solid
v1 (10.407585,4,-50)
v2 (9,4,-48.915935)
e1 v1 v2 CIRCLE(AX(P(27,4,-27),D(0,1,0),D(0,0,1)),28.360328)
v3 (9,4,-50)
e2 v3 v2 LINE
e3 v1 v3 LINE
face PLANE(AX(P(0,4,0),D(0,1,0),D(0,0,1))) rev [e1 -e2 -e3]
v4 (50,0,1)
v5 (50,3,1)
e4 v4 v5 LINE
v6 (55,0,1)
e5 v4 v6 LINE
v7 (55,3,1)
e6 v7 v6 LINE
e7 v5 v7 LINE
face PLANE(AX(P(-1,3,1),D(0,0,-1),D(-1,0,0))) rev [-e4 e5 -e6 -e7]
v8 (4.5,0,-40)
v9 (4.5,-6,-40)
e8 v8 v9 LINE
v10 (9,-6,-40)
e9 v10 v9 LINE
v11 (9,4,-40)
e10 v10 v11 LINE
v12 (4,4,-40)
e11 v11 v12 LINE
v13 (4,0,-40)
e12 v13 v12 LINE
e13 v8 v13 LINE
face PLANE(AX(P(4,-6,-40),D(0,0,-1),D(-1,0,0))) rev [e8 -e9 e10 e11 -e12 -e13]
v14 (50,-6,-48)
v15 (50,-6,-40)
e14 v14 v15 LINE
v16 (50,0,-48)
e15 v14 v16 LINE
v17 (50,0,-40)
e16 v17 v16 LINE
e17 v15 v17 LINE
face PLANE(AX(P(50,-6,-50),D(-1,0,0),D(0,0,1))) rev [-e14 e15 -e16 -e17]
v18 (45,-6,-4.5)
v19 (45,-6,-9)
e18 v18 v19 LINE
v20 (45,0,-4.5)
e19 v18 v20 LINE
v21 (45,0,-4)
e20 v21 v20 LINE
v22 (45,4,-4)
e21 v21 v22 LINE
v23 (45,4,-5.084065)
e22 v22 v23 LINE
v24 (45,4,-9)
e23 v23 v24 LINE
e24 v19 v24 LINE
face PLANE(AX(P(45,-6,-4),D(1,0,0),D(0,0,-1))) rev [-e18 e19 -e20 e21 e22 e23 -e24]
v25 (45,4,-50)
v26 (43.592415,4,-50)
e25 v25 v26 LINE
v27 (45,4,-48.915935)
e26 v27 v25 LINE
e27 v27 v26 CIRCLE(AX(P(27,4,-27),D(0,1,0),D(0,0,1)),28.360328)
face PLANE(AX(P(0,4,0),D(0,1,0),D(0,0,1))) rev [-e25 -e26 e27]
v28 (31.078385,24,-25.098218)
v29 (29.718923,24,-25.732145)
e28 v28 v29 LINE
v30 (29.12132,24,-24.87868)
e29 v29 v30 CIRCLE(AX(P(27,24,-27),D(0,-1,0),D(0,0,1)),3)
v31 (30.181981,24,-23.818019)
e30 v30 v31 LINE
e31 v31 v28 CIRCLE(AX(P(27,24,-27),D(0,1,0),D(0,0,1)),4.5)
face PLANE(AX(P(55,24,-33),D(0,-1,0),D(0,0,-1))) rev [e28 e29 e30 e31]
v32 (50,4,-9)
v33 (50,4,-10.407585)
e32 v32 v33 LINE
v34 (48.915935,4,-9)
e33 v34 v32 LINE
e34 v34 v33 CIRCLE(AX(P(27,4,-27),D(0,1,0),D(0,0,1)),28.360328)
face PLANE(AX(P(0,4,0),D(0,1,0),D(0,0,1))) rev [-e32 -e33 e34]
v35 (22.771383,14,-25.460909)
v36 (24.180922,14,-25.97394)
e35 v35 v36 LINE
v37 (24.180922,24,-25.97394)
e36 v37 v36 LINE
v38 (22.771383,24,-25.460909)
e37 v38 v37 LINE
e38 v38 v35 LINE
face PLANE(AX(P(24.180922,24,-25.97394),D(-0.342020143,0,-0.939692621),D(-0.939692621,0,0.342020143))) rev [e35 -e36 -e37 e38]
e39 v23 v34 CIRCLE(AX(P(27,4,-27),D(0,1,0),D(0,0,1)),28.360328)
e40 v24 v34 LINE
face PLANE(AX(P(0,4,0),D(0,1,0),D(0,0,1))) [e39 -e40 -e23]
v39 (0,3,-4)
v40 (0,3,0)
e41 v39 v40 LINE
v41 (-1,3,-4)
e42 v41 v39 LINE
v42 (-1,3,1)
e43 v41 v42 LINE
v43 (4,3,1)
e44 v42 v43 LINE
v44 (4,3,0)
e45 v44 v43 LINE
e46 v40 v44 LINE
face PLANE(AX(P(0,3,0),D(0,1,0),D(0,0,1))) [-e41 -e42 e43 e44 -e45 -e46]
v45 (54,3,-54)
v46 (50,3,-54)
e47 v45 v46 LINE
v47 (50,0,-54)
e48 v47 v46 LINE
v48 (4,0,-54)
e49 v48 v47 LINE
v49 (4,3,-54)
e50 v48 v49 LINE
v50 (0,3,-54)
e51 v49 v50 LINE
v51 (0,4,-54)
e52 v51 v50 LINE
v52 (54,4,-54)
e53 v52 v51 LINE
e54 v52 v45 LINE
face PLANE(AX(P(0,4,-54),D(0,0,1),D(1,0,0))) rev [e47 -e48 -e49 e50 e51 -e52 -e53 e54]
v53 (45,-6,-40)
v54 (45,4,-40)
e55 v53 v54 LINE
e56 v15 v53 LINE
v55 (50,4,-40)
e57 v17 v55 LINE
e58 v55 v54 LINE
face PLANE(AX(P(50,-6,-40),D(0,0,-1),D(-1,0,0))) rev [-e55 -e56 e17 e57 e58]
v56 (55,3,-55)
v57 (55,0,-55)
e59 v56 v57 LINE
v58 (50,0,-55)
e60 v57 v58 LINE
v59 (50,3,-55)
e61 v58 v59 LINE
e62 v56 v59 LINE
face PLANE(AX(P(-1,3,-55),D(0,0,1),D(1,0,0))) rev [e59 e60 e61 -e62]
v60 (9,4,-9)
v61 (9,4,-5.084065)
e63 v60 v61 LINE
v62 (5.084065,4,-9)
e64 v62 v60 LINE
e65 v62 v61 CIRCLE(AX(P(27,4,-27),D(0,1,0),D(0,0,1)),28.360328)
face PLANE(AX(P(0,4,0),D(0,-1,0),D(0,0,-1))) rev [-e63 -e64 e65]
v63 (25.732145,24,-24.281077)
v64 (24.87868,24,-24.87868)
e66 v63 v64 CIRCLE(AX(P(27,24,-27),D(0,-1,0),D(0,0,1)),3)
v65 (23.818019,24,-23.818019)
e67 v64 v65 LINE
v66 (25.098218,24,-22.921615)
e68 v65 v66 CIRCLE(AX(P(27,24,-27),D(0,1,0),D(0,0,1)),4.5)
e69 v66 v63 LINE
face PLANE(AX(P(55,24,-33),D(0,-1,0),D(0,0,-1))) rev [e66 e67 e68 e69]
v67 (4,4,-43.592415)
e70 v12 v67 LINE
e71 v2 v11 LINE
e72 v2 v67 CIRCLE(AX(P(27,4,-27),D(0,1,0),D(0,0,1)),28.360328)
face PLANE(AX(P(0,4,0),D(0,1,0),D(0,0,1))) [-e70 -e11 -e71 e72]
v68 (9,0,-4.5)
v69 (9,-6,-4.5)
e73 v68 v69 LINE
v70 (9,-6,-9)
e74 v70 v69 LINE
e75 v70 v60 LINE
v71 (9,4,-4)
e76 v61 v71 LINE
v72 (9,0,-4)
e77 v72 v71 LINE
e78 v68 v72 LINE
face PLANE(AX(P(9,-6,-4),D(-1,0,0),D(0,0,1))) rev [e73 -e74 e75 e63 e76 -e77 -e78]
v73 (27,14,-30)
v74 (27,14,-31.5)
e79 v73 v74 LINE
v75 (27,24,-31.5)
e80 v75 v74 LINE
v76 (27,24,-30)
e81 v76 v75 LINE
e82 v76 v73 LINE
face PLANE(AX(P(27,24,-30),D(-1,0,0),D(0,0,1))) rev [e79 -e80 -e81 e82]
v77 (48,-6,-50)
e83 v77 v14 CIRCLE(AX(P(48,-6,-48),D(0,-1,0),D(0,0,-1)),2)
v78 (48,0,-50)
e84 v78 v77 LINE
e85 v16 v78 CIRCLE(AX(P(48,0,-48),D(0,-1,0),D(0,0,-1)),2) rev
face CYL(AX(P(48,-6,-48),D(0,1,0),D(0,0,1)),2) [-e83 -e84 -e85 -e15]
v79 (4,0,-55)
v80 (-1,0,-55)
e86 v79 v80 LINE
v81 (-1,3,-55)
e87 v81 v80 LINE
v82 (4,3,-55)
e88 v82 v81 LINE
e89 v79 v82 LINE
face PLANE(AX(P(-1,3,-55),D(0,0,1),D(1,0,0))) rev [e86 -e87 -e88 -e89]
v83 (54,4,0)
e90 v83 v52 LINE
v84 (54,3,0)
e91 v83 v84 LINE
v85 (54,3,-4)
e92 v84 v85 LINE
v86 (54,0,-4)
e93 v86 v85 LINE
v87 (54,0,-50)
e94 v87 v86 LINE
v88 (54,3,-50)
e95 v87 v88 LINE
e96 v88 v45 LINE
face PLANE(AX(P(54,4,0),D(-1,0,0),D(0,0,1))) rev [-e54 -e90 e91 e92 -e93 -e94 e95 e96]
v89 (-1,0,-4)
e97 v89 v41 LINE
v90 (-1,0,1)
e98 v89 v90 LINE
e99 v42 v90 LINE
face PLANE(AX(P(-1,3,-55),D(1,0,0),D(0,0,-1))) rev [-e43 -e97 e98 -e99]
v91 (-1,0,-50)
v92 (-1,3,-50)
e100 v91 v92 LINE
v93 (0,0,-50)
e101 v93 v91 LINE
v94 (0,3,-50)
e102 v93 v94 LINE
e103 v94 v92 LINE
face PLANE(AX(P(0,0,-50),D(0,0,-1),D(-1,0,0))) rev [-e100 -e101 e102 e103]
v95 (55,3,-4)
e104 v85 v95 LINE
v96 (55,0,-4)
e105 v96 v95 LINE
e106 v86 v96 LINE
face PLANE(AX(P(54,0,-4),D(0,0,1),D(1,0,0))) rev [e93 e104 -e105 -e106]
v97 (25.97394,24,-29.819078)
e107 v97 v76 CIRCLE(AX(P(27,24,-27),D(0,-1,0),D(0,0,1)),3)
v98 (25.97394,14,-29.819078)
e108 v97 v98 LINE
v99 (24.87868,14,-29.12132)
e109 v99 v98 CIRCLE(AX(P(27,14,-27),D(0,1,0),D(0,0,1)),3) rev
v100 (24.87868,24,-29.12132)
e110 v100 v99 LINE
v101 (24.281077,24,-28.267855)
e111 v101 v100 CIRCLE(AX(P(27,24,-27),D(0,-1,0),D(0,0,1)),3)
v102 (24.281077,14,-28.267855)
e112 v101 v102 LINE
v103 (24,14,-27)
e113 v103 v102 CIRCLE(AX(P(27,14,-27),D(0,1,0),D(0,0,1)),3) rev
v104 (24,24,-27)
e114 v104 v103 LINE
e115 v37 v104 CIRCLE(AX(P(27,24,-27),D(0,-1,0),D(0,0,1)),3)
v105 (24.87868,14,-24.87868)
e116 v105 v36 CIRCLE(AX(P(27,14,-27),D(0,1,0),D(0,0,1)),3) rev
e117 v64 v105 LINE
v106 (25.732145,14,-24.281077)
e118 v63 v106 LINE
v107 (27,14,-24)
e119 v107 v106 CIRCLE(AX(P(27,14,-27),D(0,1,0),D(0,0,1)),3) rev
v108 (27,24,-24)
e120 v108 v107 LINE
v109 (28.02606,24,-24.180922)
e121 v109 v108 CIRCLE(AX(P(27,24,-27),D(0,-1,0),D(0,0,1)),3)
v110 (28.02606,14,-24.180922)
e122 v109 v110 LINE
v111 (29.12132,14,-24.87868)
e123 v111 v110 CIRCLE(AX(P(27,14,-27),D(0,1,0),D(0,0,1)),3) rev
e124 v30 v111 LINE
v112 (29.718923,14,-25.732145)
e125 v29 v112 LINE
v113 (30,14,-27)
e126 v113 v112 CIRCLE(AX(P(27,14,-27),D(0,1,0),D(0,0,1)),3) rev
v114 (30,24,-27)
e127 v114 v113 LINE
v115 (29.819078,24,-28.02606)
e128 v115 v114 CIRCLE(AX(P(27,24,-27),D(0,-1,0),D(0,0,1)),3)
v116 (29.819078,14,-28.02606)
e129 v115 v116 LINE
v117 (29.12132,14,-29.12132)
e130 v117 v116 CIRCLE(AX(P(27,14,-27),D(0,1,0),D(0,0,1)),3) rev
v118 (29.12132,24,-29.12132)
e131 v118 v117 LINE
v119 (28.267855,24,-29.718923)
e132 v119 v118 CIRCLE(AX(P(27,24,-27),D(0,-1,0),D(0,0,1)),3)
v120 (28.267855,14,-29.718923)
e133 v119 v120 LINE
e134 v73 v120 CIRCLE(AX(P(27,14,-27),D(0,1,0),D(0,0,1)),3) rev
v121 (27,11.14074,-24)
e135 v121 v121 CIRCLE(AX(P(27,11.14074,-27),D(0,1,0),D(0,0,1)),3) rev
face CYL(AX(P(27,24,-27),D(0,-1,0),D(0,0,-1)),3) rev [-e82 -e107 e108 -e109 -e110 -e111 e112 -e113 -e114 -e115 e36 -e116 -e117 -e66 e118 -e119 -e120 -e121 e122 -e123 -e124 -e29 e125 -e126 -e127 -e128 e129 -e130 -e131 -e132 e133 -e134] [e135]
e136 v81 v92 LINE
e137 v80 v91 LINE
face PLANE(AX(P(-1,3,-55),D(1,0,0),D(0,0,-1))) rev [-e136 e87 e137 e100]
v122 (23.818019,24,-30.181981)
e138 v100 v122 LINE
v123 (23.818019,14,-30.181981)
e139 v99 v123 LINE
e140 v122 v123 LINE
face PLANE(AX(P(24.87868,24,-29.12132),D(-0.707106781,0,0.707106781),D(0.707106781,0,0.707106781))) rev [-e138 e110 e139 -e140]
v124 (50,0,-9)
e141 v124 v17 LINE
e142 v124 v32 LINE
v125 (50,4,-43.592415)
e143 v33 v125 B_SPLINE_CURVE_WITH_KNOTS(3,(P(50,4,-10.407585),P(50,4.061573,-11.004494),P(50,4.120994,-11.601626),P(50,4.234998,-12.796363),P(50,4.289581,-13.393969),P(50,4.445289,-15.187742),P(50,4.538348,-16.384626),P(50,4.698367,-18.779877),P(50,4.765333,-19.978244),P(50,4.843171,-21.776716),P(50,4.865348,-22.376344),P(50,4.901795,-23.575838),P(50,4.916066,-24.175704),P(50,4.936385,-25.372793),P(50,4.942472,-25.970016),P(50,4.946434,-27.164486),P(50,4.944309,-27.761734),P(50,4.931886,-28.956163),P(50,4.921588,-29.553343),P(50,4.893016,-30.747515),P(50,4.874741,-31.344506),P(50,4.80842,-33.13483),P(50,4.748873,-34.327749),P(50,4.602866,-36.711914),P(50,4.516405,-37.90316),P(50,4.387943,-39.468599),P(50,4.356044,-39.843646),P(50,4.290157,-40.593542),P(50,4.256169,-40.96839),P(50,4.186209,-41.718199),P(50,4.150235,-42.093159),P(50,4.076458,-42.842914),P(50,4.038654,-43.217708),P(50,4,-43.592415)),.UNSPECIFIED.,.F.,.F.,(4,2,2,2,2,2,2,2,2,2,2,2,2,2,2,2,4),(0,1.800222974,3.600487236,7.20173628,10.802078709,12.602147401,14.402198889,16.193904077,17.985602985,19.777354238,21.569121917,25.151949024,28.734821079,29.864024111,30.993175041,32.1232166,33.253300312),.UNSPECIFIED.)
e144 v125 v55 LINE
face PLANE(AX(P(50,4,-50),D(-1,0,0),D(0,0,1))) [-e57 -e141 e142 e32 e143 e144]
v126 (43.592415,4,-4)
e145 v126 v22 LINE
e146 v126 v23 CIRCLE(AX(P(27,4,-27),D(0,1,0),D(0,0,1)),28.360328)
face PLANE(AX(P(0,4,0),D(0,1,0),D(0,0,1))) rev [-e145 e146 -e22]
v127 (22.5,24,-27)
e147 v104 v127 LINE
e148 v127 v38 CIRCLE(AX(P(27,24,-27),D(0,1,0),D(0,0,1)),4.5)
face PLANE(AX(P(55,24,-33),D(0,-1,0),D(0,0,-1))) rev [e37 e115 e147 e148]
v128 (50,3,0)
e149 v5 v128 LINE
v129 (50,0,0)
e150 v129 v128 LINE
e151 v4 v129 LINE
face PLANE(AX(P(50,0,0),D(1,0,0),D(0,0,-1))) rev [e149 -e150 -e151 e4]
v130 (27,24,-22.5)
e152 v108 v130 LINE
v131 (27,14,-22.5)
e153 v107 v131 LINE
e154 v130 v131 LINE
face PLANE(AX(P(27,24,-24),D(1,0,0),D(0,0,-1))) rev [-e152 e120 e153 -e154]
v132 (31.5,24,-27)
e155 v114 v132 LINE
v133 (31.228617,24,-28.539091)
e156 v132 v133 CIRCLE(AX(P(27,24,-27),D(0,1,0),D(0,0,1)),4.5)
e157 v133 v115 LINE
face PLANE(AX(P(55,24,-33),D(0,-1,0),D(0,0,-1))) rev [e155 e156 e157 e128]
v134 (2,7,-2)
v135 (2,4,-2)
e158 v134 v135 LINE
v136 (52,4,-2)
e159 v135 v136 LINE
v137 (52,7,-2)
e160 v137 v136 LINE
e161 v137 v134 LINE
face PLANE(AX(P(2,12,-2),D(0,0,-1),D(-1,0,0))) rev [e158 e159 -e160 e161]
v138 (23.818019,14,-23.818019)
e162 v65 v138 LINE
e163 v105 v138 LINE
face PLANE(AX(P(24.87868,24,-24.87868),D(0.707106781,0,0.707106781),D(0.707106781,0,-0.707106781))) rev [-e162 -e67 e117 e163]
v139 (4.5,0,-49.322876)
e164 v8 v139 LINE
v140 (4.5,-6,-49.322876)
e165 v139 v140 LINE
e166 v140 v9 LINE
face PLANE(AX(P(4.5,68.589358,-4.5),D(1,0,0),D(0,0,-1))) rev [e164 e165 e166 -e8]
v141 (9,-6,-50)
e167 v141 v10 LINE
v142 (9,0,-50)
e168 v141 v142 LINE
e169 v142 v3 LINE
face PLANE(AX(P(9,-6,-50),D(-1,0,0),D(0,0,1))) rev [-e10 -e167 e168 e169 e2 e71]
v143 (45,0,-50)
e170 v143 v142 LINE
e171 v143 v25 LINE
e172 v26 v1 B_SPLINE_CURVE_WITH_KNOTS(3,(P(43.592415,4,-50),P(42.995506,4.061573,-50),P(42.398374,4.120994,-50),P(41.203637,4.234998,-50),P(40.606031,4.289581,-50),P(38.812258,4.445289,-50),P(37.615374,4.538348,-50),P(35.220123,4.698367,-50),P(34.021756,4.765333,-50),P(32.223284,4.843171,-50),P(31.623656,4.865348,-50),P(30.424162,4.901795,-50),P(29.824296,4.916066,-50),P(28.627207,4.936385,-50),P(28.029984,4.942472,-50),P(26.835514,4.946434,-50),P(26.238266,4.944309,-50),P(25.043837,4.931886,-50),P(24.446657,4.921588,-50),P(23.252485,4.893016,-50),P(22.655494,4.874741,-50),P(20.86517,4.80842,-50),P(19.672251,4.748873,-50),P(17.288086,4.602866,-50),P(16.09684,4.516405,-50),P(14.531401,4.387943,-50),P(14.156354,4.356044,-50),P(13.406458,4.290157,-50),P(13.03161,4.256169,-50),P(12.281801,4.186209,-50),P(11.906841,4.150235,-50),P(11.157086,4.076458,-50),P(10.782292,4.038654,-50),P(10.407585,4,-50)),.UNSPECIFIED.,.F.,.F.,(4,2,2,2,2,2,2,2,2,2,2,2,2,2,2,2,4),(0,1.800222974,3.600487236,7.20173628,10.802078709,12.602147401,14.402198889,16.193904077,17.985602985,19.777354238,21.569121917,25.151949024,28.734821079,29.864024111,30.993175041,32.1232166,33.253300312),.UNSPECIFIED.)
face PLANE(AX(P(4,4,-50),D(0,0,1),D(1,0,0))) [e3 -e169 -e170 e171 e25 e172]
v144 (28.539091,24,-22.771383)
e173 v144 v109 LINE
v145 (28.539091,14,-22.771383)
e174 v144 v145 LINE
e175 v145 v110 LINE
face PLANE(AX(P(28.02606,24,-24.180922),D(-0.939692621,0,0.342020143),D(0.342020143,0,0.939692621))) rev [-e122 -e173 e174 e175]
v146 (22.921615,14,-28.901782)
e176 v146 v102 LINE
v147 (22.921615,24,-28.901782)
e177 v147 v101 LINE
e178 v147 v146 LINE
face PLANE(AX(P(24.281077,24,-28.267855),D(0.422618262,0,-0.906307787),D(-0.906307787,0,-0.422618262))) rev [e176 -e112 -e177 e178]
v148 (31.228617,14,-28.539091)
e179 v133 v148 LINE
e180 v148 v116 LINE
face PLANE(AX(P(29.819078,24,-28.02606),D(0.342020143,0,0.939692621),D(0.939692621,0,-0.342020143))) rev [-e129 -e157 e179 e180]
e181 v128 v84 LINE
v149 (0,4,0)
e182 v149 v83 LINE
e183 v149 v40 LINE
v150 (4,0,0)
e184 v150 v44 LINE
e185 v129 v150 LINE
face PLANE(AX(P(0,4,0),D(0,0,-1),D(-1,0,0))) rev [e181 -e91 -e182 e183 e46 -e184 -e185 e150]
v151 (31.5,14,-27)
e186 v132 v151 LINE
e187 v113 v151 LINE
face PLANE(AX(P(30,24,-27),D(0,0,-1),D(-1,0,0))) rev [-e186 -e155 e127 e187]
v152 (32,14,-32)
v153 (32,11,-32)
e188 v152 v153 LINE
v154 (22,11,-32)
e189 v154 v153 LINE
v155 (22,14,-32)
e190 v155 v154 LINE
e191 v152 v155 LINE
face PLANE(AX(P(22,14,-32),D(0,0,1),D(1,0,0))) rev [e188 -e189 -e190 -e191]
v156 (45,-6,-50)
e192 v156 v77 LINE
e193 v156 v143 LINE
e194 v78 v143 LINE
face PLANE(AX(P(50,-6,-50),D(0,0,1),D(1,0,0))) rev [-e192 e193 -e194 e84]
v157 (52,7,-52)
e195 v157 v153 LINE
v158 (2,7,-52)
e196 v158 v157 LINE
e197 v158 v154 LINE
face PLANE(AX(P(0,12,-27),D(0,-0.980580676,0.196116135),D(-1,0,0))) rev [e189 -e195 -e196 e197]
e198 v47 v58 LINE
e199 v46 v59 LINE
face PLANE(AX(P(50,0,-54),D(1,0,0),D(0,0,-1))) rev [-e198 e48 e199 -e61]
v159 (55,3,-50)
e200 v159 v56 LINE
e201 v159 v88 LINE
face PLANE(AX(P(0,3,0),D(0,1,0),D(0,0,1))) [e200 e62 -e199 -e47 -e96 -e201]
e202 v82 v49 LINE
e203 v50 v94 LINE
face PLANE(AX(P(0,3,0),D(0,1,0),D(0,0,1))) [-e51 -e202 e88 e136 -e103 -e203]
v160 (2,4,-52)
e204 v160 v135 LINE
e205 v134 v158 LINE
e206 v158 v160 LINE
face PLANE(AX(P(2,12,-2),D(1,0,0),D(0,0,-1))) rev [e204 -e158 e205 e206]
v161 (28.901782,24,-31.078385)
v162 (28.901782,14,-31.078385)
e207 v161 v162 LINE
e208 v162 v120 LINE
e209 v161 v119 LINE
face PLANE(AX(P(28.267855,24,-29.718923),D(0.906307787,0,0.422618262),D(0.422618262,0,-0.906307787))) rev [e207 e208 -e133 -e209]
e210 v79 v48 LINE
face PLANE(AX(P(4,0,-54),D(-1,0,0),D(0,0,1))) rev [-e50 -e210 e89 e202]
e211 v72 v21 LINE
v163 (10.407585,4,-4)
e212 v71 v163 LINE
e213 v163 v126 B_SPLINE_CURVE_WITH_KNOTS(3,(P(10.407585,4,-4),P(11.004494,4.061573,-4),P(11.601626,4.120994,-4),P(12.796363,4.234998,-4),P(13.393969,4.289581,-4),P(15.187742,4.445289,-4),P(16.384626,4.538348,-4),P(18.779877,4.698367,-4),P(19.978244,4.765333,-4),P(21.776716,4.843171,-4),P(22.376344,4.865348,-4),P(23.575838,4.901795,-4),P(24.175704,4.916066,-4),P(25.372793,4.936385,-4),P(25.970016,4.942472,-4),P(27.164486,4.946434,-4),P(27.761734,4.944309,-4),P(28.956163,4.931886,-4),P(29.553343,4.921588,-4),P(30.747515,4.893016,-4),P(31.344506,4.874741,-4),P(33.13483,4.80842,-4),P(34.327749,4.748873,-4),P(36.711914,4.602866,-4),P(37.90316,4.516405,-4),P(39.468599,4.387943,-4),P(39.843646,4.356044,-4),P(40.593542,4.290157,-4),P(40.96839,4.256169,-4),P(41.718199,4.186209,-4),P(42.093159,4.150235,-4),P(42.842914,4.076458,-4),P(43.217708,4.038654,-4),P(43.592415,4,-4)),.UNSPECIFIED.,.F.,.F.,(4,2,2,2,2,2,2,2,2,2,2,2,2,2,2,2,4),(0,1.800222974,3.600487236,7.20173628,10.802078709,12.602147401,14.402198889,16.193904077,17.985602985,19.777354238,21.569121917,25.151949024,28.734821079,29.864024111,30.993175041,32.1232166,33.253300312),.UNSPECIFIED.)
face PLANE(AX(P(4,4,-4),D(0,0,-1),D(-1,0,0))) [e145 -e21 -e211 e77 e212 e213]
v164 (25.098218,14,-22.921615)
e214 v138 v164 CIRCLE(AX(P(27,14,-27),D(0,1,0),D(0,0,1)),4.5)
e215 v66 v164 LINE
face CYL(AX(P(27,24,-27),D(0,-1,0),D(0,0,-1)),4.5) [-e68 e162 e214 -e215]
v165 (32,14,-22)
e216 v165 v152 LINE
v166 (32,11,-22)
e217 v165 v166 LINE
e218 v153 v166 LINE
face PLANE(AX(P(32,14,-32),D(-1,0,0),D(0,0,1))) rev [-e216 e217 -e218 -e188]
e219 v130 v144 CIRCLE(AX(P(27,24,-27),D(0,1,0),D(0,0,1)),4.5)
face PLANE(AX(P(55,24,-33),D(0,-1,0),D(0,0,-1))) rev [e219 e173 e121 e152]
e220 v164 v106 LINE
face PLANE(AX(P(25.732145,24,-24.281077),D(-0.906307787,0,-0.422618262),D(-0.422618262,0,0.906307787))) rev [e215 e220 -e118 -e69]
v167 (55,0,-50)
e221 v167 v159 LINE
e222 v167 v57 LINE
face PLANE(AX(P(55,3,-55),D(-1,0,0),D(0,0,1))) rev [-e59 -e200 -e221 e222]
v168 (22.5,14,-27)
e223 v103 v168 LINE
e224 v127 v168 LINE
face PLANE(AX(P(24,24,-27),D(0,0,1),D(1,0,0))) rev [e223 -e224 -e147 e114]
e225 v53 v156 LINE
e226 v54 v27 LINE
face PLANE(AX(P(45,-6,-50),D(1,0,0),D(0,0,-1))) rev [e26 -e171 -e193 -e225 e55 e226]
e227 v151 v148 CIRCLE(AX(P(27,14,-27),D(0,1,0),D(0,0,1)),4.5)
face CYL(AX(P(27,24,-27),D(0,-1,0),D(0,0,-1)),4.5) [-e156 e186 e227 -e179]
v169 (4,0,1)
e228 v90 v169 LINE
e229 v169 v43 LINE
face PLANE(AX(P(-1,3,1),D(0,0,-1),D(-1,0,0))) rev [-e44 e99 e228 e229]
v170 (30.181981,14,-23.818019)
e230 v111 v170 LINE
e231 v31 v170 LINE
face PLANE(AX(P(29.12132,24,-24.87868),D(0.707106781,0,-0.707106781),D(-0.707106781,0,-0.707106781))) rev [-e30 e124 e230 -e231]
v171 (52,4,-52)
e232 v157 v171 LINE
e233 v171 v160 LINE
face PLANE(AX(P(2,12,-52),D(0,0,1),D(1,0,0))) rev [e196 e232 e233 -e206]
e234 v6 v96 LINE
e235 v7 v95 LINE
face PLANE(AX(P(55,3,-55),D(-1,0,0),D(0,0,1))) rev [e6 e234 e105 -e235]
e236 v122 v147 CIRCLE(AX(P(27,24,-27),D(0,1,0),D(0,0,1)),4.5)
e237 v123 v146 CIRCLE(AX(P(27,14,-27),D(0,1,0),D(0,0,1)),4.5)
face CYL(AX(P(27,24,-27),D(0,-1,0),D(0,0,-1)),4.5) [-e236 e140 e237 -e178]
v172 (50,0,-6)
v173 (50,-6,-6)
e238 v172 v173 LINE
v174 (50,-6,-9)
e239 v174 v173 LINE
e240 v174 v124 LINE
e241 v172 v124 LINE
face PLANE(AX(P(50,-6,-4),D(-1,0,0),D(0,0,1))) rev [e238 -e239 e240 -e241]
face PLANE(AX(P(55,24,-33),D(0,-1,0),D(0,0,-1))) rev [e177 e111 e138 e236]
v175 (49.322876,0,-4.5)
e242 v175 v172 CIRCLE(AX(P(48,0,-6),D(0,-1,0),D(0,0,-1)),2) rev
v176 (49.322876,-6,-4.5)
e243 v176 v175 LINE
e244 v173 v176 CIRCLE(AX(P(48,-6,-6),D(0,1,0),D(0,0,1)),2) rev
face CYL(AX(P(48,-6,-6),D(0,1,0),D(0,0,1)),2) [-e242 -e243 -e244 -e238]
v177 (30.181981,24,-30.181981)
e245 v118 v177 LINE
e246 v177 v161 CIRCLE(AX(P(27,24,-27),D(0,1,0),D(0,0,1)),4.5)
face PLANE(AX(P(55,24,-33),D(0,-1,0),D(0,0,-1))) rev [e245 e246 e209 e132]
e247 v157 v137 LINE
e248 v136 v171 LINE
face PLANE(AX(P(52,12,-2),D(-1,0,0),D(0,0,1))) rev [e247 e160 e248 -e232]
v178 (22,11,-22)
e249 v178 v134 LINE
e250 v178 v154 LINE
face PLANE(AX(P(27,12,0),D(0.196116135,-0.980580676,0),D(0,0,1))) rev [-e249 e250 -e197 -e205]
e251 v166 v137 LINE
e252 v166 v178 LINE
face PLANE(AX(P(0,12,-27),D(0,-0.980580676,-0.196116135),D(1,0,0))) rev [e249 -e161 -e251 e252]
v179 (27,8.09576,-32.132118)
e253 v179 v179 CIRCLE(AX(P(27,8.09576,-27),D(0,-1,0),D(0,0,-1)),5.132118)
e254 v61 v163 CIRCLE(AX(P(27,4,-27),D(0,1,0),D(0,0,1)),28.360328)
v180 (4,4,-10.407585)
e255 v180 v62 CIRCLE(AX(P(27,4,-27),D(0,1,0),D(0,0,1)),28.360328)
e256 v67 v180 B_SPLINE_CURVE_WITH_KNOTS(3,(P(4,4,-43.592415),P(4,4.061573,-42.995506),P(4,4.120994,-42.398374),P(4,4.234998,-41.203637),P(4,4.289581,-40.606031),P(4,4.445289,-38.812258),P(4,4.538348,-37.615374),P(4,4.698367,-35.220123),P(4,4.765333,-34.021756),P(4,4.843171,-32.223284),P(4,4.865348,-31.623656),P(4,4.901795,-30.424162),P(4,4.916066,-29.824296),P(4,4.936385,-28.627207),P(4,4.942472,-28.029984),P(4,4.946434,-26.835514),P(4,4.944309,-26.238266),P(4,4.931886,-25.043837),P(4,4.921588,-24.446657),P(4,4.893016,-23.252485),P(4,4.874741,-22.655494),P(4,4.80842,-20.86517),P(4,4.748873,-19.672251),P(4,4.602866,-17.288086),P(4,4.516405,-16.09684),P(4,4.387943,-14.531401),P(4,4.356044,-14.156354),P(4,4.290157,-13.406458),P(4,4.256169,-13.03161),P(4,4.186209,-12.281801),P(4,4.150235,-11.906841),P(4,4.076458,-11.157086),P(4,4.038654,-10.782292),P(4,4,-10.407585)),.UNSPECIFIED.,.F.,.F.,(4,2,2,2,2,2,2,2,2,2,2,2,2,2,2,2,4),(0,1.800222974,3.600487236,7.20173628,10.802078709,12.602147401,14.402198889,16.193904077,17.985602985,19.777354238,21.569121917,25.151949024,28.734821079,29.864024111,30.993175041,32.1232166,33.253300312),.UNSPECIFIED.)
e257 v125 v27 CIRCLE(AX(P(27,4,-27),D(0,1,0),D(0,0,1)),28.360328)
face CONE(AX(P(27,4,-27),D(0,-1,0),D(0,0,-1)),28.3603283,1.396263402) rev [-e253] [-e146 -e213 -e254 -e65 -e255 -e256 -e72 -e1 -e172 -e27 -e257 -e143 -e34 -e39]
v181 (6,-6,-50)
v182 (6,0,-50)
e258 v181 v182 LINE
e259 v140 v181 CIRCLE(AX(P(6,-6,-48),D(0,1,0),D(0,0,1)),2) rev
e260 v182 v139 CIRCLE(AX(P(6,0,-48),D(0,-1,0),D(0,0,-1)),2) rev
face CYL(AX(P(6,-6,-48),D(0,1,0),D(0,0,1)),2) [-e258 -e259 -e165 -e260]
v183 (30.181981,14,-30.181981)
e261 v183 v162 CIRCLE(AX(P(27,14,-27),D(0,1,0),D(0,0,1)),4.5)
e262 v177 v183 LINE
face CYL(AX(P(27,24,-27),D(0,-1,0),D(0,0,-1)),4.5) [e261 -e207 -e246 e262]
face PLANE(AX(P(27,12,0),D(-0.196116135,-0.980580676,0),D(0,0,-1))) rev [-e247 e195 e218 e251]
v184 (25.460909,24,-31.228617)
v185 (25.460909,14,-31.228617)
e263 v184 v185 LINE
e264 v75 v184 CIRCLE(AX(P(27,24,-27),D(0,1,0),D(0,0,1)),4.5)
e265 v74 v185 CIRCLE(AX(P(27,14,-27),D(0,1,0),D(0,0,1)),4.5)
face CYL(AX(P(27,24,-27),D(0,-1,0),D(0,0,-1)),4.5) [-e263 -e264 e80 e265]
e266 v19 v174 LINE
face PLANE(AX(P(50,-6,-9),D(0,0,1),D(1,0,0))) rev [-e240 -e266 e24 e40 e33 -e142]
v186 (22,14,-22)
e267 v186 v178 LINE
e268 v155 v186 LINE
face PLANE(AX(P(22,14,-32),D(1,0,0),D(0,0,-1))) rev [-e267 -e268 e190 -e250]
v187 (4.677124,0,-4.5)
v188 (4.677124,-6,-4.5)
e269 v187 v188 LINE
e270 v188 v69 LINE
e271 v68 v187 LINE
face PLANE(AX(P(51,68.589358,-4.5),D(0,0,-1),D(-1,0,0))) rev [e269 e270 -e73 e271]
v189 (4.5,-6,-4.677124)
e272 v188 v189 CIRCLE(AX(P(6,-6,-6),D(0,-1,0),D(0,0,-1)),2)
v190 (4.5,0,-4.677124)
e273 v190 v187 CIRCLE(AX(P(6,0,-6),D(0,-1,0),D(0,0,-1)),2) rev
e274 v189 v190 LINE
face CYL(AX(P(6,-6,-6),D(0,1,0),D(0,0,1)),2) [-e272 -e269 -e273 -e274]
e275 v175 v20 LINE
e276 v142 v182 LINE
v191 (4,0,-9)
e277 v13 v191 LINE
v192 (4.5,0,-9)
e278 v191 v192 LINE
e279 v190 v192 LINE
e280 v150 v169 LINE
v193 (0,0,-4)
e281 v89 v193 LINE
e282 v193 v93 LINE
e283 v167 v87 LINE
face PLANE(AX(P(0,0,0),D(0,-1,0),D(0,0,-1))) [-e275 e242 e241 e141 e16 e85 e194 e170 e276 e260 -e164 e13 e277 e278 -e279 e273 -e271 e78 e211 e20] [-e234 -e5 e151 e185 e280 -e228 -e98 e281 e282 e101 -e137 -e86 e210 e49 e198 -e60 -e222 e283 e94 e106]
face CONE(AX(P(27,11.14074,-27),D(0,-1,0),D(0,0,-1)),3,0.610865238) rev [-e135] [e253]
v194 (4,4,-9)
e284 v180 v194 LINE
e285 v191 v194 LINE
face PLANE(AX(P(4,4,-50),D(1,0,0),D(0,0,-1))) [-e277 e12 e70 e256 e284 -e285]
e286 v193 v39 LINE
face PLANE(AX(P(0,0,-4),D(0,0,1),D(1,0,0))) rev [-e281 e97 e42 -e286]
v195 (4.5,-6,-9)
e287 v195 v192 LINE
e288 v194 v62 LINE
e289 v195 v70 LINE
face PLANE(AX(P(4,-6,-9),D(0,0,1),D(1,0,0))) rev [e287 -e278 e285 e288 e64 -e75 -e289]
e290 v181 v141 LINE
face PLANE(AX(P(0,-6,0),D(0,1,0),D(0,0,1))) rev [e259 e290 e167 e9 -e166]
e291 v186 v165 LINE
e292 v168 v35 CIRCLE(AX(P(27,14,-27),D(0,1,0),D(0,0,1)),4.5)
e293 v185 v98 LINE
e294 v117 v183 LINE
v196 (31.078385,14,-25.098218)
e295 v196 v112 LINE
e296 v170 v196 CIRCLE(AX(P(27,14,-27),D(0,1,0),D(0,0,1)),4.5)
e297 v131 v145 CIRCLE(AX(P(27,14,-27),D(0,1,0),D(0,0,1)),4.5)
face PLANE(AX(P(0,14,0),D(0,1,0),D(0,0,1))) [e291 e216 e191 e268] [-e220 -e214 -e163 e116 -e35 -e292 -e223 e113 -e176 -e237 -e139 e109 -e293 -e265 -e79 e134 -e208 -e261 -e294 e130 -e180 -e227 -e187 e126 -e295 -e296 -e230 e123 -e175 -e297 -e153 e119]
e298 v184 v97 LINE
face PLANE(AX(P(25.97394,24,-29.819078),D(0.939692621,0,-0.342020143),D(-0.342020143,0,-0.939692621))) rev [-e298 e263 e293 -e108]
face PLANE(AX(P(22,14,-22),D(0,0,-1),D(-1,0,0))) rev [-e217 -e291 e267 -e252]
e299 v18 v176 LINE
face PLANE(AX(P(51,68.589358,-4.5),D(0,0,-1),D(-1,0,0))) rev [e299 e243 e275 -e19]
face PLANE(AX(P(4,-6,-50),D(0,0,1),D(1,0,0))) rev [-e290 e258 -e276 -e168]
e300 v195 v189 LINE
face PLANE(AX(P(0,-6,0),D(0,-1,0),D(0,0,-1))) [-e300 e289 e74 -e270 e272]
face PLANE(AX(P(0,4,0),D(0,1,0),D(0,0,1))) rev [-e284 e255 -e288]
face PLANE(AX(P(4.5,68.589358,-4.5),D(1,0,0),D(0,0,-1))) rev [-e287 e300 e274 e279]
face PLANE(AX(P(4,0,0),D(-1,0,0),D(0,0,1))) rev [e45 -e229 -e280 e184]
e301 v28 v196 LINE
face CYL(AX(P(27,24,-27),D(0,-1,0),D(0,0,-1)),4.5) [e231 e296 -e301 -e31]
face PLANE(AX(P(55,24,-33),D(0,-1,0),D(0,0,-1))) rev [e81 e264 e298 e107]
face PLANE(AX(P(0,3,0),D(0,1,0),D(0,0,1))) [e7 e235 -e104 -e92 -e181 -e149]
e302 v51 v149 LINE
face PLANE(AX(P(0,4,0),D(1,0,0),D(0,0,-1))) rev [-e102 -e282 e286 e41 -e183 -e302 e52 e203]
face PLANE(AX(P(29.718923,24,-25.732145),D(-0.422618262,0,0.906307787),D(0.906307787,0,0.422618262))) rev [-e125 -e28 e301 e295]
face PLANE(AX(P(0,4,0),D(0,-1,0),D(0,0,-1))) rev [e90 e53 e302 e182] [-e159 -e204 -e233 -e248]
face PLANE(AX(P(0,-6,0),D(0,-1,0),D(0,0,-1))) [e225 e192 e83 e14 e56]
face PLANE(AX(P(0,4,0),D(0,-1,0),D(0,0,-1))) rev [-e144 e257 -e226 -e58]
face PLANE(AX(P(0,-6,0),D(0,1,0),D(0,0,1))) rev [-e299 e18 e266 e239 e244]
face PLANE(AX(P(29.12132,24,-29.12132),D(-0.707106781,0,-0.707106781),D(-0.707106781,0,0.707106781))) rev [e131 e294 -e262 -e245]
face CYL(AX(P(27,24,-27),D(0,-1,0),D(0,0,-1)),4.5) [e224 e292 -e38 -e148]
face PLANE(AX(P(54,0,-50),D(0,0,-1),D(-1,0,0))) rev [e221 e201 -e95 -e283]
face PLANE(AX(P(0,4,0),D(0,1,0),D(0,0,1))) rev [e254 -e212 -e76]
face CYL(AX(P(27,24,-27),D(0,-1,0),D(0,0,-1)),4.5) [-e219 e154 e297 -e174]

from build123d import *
from build123d.topology import SkipClean

# Parameters (mm, degrees)
SKETCH_1_W          = 54
SKETCH_1_H          = 54
EXTRUDE_1_DEPTH     = 4
SKETCH_2_W          = 50
SKETCH_2_H          = 50
EXTRUDE_2_DEPTH     = 8
CHAMFER_1_SIZE      = 5
CHAMFER_1_SIZE_2    = 25
SKETCH_3_W          = 56
SKETCH_3_H          = 56
EXTRUDE_3_DEPTH     = 3
SKETCH_4_W          = 46
SKETCH_4_H          = 1
SKETCH_4_W_2        = 1
SKETCH_4_H_2        = 46
CUT_EXTRUDE_1_DEPTH = 3
EXTRUDE_START       = 10
SKETCH_5_W          = 10
SKETCH_5_H          = 10
EXTRUDE_4_DEPTH     = 4
EXTRUDE_5_DEPTH     = 10
SKETCH_10_W         = 46
SKETCH_10_H         = 46
CUT_EXTRUDE_2_DEPTH = 4
SKETCH_12_R         = 3
CUT_EXTRUDE_3_DEPTH = 15
CHAMFER_2_SIZE      = 5
CHAMFER_2_SIZE2     = 7.140740034
CHAMFER_3_SIZE      = 5
CHAMFER_3_SIZE_2    = 20.3603283
SKETCH_13_W         = 5
SKETCH_13_H         = 5
EXTRUDE_6_DEPTH     = 10
SKETCH_14_W         = 5
SKETCH_14_H         = 10
EXTRUDE_7_DEPTH     = 10
FILLET_1_R          = 2
CUT_EXTRUDE_4_DEPTH = 6
SKETCH_16_W         = 12.181950641
SKETCH_16_H         = 4.017842963
CUT_EXTRUDE_5_DEPTH = 82.012344772


with BuildPart() as part:
    # Эскиз1 → Бобышка-Вытянуть1 (new body)
    with BuildSketch(Plane(origin=(0, 0, 0), x_dir=(1, 0, 0), z_dir=(0, 1, 0))):
        with Locations((27, 27)):
            Rectangle(SKETCH_1_W, SKETCH_1_H)
    extrude(amount=EXTRUDE_1_DEPTH)

    # Эскиз2 → Бобышка-Вытянуть2 (add)
    with BuildSketch(Plane(origin=(0, 4, 0), x_dir=(1, 0, 0), z_dir=(0, 1, 0))):
        with Locations((27, 27)):
            Rectangle(SKETCH_2_W, SKETCH_2_H)
    extrude(amount=EXTRUDE_2_DEPTH)

    # Фаска1
    # the kernel refuses this chamfer: 25, 5 mm, written as the material it takes off along each edge
    with BuildSketch(Plane(origin=(2, 12, -116.953302157), x_dir=(-0.18544098588999025, -0.9826554028509427, 0), z_dir=(0, 0, 1)), Plane(origin=(-62.953302157, 12, -2), x_dir=(0, -0.9826554028509427, 0.18544098588999025), z_dir=(1, 0, 0)), Plane(origin=(52, 12, 62.953302157), x_dir=(0.18544098588999086, -0.9826554028509427, 0), z_dir=(0, 0, -1)), Plane(origin=(116.953302157, 12, -52), x_dir=(0, -0.9826554028509427, -0.18544098588999086), z_dir=(-1, 0, 0))) as chamfer_1_piece_1:
        Polygon((CHAMFER_1_SIZE * 0.982655402851, CHAMFER_1_SIZE * 0.18544098589), (-CHAMFER_1_SIZE_2 * 0.18544098589, CHAMFER_1_SIZE_2 * 0.982655402851), (0, 0), align=None)
    extrude(amount=179.906604315, mode=Mode.SUBTRACT)

    # Эскиз3 → Бобышка-Вытянуть3 (add)
    with BuildSketch(Plane(origin=(0, 0, 0), x_dir=(1, 0, 0), z_dir=(0, 1, 0))):
        with Locations((27, 27)):
            Rectangle(SKETCH_3_W, SKETCH_3_H)
    extrude(amount=EXTRUDE_3_DEPTH)

    # Эскиз4 → Вырез-Вытянуть1 (cut)
    with BuildSketch(Plane(origin=(0, 3, 0), x_dir=(1, 0, 0), z_dir=(0, 1, 0))):
        with Locations((27, 54.5)):
            Rectangle(SKETCH_4_W, SKETCH_4_H)
        with Locations((-0.5, 27)):
            Rectangle(SKETCH_4_W_2, SKETCH_4_H_2)
        with Locations((54.5, 27)):
            Rectangle(SKETCH_4_W_2, SKETCH_4_H_2)
        with Locations((27, -0.5)):
            Rectangle(SKETCH_4_W, SKETCH_4_H)
    extrude(amount=-CUT_EXTRUDE_1_DEPTH, mode=Mode.SUBTRACT)

    # Эскиз5 → Бобышка-Вытянуть4 (add)
    with BuildSketch(Plane(origin=(0, 0, 0), x_dir=(1, 0, 0), z_dir=(0, 1, 0)).offset(EXTRUDE_START)):
        with Locations((27, 27)):
            Rectangle(SKETCH_5_W, SKETCH_5_H)
    extrude(amount=EXTRUDE_4_DEPTH)

    # Эскиз6 → Бобышка-Вытянуть5 (add)
    with BuildSketch(Plane(origin=(0, 14, 0), x_dir=(1, 0, 0), z_dir=(0, 1, 0))):
        with BuildLine():
            Line((27, 30), (27, 31.5))
            ThreePointArc((27, 31.5), (26.2185832, 31.431634889), (25.460909355, 31.228616794))
            Line((25.460909355, 31.228616794), (25.97393957, 29.819077862))
            ThreePointArc((25.97393957, 29.819077862), (26.479055467, 29.954423259), (27, 30))
        make_face()
        with BuildLine():
            Line((29.121320344, 29.121320344), (30.181980515, 30.181980515))
            ThreePointArc((30.181980515, 30.181980515), (29.581093964, 30.686184199), (28.901782178, 31.078385042))
            Line((28.901782178, 31.078385042), (28.267854785, 29.718923361))
            ThreePointArc((28.267854785, 29.718923361), (28.720729309, 29.457456133), (29.121320344, 29.121320344))
        make_face()
        with BuildLine():
            Line((30, 27), (31.5, 27))
            ThreePointArc((31.5, 27), (31.431634889, 27.7814168), (31.228616794, 28.539090645))
            Line((31.228616794, 28.539090645), (29.819077862, 28.02606043))
            ThreePointArc((29.819077862, 28.02606043), (29.954423259, 27.520944533), (30, 27))
        make_face()
        with BuildLine():
            Line((29.121320344, 24.878679656), (30.181980515, 23.818019485))
            ThreePointArc((30.181980515, 23.818019485), (30.686184199, 24.418906036), (31.078385042, 25.098217822))
            Line((31.078385042, 25.098217822), (29.718923361, 25.732145215))
            ThreePointArc((29.718923361, 25.732145215), (29.457456133, 25.279270691), (29.121320344, 24.878679656))
        make_face()
        with BuildLine():
            Line((27, 24), (27, 22.5))
            ThreePointArc((27, 22.5), (27.7814168, 22.568365111), (28.539090645, 22.771383206))
            Line((28.539090645, 22.771383206), (28.02606043, 24.180922138))
            ThreePointArc((28.02606043, 24.180922138), (27.520944533, 24.045576741), (27, 24))
        make_face()
        with BuildLine():
            Line((24.878679656, 24.878679656), (23.818019485, 23.818019485))
            ThreePointArc((23.818019485, 23.818019485), (24.418906036, 23.313815801), (25.098217822, 22.921614958))
            Line((25.098217822, 22.921614958), (25.732145215, 24.281076639))
            ThreePointArc((25.732145215, 24.281076639), (25.279270691, 24.542543867), (24.878679656, 24.878679656))
        make_face()
        with BuildLine():
            Line((24, 27), (22.5, 27))
            ThreePointArc((22.5, 27), (22.568365111, 26.2185832), (22.771383206, 25.460909355))
            Line((22.771383206, 25.460909355), (24.180922138, 25.97393957))
            ThreePointArc((24.180922138, 25.97393957), (24.045576741, 26.479055467), (24, 27))
        make_face()
        with BuildLine():
            Line((24.878679656, 29.121320344), (23.818019485, 30.181980515))
            ThreePointArc((23.818019485, 30.181980515), (23.313815801, 29.581093964), (22.921614958, 28.901782178))
            Line((22.921614958, 28.901782178), (24.281076639, 28.267854785))
            ThreePointArc((24.281076639, 28.267854785), (24.542543867, 28.720729309), (24.878679656, 29.121320344))
        make_face()
    extrude(amount=EXTRUDE_5_DEPTH)

    # Эскиз9 → Повернуть1 (revolve)
    with BuildSketch(Plane(origin=(27, 0, 0), x_dir=(0, 0, -1), z_dir=(1, 0, 0))):
        with BuildLine():
            Line((27, 24), (33, 24))
            Line((33, 24), (28.599558116, 25.80595603))
            ThreePointArc((28.599558116, 25.80595603), (27.95267314, 26.60779708), (27, 27))
            Line((27, 27), (27, 24))
        make_face()
    revolve(axis=Axis((27, 24, -27), (0, 1, 0)))

    # Эскиз10 → Вырез-Вытянуть2 (cut)
    with BuildSketch(Plane(origin=(0, 0, 0), x_dir=(1, 0, 0), z_dir=(0, 1, 0))):
        with Locations((27, 27)):
            Rectangle(SKETCH_10_W, SKETCH_10_H)
    extrude(amount=CUT_EXTRUDE_2_DEPTH, mode=Mode.SUBTRACT)

    # Эскиз12 → Вырез-Вытянуть3 (cut)
    with SkipClean():  # the faces are left unmerged after this step: merging them gives an invalid solid
        with BuildSketch(Plane(origin=(0, 0, 0), x_dir=(1, 0, 0), z_dir=(0, 1, 0))):
            with Locations(Location((27, 27, 0), (0, 0, 270))):
                Circle(SKETCH_12_R)
        extrude(amount=CUT_EXTRUDE_3_DEPTH, mode=Mode.SUBTRACT)
    add(part.part.scale(1), mode=Mode.REPLACE)  # the faces are merged on a copy

    # Фаска2
    chamfer_2_edges = [part.edges().sort_by_distance(p)[0] for p in [
        (27, 4, -30),
    ]]
    chamfer_2_side = [part.faces().sort_by_distance(p)[0] for p in [
        (27, 4, -49.349461761),
    ]]
    chamfer(chamfer_2_edges, length=CHAMFER_2_SIZE, length2=CHAMFER_2_SIZE2, reference=chamfer_2_side[0])

    # Фаска3
    # the kernel refuses this chamfer: 20.3603283, 5 mm, written as the material it takes off along each edge
    with BuildSketch(Plane(origin=(27, 4, -27), x_dir=(0, 0, 1), z_dir=(1, 0, 0))) as chamfer_3_piece_1_section:
        Polygon((8 - CHAMFER_3_SIZE * 0.573576436351, -CHAMFER_3_SIZE * 0.819152044289), (8 + CHAMFER_3_SIZE_2, 0), (8, 0), align=None)
    chamfer_3_piece_1 = revolve(axis=Axis((27, 4, -27), (0, -1, 0)), mode=Mode.PRIVATE)
    chamfer_3_piece_1 = split(chamfer_3_piece_1, bisect_by=Plane(origin=(27, 5.887283675, -50), z_dir=(0, 0, 1)), keep=Keep.TOP, mode=Mode.PRIVATE)
    chamfer_3_piece_1 = split(chamfer_3_piece_1, bisect_by=Plane(origin=(4, 5.887283675, -43.717905574), z_dir=(1, 0, 0)), keep=Keep.TOP, mode=Mode.PRIVATE)
    chamfer_3_piece_1 = split(chamfer_3_piece_1, bisect_by=Plane(origin=(50, 5.887283675, -43.717905574), z_dir=(-1, 0, 0)), keep=Keep.TOP, mode=Mode.PRIVATE)
    chamfer_3_piece_1 = split(chamfer_3_piece_1, bisect_by=Plane(origin=(27, 5.887283675, -4), z_dir=(0, 0, -1)), keep=Keep.TOP, mode=Mode.PRIVATE)
    add(chamfer_3_piece_1, mode=Mode.SUBTRACT)

    # Эскиз13 → Бобышка-Вытянуть6 (add)
    with SkipClean():  # the faces are left unmerged after this step: merging them gives an invalid solid
        with BuildSketch(Plane.XZ.offset(-4)):
            with Locations((6.5, -6.5)):
                Rectangle(SKETCH_13_W, SKETCH_13_H)
            with Locations((47.5, -6.5)):
                Rectangle(SKETCH_13_W, SKETCH_13_H)
        extrude(amount=EXTRUDE_6_DEPTH)

    # Эскиз14 → Бобышка-Вытянуть7 (add)
    with SkipClean():  # the faces are left unmerged after this step: merging them gives an invalid solid
        with BuildSketch(Plane.XZ.offset(-4)):
            with Locations((47.5, -45)):
                Rectangle(SKETCH_14_W, SKETCH_14_H)
            with Locations((6.5, -45)):
                Rectangle(SKETCH_14_W, SKETCH_14_H)
        extrude(amount=EXTRUDE_7_DEPTH)

    # Скругление1
    fillet_1_edges = [part.edges().sort_by_distance(p)[0] for p in [
        (4, -3, -4),
        (50, -3, -4),
        (50, -3, -50),
        (4, -3, -50),
    ]]
    fillet(fillet_1_edges, radius=FILLET_1_R)

    # Эскиз15 → Вырез-Вытянуть4 (cut)
    with BuildSketch(Plane.XZ.offset(6)):
        Polygon((51, -4.5), (4.5, -4.5), (4.5, -51), (2.5, -51), (2.5, -2.5), (51, -2.5), align=None)
    extrude(amount=-CUT_EXTRUDE_4_DEPTH, mode=Mode.SUBTRACT)

    # Эскиз16 → Вырез-Вытянуть5 (cut, through all)
    with BuildSketch(Plane.ZY.offset(-2)):
        with Locations((-26.909024679, 26.008921482)):
            Rectangle(SKETCH_16_W, SKETCH_16_H)
    extrude(amount=-CUT_EXTRUDE_5_DEPTH, mode=Mode.SUBTRACT)


solid = part.part
